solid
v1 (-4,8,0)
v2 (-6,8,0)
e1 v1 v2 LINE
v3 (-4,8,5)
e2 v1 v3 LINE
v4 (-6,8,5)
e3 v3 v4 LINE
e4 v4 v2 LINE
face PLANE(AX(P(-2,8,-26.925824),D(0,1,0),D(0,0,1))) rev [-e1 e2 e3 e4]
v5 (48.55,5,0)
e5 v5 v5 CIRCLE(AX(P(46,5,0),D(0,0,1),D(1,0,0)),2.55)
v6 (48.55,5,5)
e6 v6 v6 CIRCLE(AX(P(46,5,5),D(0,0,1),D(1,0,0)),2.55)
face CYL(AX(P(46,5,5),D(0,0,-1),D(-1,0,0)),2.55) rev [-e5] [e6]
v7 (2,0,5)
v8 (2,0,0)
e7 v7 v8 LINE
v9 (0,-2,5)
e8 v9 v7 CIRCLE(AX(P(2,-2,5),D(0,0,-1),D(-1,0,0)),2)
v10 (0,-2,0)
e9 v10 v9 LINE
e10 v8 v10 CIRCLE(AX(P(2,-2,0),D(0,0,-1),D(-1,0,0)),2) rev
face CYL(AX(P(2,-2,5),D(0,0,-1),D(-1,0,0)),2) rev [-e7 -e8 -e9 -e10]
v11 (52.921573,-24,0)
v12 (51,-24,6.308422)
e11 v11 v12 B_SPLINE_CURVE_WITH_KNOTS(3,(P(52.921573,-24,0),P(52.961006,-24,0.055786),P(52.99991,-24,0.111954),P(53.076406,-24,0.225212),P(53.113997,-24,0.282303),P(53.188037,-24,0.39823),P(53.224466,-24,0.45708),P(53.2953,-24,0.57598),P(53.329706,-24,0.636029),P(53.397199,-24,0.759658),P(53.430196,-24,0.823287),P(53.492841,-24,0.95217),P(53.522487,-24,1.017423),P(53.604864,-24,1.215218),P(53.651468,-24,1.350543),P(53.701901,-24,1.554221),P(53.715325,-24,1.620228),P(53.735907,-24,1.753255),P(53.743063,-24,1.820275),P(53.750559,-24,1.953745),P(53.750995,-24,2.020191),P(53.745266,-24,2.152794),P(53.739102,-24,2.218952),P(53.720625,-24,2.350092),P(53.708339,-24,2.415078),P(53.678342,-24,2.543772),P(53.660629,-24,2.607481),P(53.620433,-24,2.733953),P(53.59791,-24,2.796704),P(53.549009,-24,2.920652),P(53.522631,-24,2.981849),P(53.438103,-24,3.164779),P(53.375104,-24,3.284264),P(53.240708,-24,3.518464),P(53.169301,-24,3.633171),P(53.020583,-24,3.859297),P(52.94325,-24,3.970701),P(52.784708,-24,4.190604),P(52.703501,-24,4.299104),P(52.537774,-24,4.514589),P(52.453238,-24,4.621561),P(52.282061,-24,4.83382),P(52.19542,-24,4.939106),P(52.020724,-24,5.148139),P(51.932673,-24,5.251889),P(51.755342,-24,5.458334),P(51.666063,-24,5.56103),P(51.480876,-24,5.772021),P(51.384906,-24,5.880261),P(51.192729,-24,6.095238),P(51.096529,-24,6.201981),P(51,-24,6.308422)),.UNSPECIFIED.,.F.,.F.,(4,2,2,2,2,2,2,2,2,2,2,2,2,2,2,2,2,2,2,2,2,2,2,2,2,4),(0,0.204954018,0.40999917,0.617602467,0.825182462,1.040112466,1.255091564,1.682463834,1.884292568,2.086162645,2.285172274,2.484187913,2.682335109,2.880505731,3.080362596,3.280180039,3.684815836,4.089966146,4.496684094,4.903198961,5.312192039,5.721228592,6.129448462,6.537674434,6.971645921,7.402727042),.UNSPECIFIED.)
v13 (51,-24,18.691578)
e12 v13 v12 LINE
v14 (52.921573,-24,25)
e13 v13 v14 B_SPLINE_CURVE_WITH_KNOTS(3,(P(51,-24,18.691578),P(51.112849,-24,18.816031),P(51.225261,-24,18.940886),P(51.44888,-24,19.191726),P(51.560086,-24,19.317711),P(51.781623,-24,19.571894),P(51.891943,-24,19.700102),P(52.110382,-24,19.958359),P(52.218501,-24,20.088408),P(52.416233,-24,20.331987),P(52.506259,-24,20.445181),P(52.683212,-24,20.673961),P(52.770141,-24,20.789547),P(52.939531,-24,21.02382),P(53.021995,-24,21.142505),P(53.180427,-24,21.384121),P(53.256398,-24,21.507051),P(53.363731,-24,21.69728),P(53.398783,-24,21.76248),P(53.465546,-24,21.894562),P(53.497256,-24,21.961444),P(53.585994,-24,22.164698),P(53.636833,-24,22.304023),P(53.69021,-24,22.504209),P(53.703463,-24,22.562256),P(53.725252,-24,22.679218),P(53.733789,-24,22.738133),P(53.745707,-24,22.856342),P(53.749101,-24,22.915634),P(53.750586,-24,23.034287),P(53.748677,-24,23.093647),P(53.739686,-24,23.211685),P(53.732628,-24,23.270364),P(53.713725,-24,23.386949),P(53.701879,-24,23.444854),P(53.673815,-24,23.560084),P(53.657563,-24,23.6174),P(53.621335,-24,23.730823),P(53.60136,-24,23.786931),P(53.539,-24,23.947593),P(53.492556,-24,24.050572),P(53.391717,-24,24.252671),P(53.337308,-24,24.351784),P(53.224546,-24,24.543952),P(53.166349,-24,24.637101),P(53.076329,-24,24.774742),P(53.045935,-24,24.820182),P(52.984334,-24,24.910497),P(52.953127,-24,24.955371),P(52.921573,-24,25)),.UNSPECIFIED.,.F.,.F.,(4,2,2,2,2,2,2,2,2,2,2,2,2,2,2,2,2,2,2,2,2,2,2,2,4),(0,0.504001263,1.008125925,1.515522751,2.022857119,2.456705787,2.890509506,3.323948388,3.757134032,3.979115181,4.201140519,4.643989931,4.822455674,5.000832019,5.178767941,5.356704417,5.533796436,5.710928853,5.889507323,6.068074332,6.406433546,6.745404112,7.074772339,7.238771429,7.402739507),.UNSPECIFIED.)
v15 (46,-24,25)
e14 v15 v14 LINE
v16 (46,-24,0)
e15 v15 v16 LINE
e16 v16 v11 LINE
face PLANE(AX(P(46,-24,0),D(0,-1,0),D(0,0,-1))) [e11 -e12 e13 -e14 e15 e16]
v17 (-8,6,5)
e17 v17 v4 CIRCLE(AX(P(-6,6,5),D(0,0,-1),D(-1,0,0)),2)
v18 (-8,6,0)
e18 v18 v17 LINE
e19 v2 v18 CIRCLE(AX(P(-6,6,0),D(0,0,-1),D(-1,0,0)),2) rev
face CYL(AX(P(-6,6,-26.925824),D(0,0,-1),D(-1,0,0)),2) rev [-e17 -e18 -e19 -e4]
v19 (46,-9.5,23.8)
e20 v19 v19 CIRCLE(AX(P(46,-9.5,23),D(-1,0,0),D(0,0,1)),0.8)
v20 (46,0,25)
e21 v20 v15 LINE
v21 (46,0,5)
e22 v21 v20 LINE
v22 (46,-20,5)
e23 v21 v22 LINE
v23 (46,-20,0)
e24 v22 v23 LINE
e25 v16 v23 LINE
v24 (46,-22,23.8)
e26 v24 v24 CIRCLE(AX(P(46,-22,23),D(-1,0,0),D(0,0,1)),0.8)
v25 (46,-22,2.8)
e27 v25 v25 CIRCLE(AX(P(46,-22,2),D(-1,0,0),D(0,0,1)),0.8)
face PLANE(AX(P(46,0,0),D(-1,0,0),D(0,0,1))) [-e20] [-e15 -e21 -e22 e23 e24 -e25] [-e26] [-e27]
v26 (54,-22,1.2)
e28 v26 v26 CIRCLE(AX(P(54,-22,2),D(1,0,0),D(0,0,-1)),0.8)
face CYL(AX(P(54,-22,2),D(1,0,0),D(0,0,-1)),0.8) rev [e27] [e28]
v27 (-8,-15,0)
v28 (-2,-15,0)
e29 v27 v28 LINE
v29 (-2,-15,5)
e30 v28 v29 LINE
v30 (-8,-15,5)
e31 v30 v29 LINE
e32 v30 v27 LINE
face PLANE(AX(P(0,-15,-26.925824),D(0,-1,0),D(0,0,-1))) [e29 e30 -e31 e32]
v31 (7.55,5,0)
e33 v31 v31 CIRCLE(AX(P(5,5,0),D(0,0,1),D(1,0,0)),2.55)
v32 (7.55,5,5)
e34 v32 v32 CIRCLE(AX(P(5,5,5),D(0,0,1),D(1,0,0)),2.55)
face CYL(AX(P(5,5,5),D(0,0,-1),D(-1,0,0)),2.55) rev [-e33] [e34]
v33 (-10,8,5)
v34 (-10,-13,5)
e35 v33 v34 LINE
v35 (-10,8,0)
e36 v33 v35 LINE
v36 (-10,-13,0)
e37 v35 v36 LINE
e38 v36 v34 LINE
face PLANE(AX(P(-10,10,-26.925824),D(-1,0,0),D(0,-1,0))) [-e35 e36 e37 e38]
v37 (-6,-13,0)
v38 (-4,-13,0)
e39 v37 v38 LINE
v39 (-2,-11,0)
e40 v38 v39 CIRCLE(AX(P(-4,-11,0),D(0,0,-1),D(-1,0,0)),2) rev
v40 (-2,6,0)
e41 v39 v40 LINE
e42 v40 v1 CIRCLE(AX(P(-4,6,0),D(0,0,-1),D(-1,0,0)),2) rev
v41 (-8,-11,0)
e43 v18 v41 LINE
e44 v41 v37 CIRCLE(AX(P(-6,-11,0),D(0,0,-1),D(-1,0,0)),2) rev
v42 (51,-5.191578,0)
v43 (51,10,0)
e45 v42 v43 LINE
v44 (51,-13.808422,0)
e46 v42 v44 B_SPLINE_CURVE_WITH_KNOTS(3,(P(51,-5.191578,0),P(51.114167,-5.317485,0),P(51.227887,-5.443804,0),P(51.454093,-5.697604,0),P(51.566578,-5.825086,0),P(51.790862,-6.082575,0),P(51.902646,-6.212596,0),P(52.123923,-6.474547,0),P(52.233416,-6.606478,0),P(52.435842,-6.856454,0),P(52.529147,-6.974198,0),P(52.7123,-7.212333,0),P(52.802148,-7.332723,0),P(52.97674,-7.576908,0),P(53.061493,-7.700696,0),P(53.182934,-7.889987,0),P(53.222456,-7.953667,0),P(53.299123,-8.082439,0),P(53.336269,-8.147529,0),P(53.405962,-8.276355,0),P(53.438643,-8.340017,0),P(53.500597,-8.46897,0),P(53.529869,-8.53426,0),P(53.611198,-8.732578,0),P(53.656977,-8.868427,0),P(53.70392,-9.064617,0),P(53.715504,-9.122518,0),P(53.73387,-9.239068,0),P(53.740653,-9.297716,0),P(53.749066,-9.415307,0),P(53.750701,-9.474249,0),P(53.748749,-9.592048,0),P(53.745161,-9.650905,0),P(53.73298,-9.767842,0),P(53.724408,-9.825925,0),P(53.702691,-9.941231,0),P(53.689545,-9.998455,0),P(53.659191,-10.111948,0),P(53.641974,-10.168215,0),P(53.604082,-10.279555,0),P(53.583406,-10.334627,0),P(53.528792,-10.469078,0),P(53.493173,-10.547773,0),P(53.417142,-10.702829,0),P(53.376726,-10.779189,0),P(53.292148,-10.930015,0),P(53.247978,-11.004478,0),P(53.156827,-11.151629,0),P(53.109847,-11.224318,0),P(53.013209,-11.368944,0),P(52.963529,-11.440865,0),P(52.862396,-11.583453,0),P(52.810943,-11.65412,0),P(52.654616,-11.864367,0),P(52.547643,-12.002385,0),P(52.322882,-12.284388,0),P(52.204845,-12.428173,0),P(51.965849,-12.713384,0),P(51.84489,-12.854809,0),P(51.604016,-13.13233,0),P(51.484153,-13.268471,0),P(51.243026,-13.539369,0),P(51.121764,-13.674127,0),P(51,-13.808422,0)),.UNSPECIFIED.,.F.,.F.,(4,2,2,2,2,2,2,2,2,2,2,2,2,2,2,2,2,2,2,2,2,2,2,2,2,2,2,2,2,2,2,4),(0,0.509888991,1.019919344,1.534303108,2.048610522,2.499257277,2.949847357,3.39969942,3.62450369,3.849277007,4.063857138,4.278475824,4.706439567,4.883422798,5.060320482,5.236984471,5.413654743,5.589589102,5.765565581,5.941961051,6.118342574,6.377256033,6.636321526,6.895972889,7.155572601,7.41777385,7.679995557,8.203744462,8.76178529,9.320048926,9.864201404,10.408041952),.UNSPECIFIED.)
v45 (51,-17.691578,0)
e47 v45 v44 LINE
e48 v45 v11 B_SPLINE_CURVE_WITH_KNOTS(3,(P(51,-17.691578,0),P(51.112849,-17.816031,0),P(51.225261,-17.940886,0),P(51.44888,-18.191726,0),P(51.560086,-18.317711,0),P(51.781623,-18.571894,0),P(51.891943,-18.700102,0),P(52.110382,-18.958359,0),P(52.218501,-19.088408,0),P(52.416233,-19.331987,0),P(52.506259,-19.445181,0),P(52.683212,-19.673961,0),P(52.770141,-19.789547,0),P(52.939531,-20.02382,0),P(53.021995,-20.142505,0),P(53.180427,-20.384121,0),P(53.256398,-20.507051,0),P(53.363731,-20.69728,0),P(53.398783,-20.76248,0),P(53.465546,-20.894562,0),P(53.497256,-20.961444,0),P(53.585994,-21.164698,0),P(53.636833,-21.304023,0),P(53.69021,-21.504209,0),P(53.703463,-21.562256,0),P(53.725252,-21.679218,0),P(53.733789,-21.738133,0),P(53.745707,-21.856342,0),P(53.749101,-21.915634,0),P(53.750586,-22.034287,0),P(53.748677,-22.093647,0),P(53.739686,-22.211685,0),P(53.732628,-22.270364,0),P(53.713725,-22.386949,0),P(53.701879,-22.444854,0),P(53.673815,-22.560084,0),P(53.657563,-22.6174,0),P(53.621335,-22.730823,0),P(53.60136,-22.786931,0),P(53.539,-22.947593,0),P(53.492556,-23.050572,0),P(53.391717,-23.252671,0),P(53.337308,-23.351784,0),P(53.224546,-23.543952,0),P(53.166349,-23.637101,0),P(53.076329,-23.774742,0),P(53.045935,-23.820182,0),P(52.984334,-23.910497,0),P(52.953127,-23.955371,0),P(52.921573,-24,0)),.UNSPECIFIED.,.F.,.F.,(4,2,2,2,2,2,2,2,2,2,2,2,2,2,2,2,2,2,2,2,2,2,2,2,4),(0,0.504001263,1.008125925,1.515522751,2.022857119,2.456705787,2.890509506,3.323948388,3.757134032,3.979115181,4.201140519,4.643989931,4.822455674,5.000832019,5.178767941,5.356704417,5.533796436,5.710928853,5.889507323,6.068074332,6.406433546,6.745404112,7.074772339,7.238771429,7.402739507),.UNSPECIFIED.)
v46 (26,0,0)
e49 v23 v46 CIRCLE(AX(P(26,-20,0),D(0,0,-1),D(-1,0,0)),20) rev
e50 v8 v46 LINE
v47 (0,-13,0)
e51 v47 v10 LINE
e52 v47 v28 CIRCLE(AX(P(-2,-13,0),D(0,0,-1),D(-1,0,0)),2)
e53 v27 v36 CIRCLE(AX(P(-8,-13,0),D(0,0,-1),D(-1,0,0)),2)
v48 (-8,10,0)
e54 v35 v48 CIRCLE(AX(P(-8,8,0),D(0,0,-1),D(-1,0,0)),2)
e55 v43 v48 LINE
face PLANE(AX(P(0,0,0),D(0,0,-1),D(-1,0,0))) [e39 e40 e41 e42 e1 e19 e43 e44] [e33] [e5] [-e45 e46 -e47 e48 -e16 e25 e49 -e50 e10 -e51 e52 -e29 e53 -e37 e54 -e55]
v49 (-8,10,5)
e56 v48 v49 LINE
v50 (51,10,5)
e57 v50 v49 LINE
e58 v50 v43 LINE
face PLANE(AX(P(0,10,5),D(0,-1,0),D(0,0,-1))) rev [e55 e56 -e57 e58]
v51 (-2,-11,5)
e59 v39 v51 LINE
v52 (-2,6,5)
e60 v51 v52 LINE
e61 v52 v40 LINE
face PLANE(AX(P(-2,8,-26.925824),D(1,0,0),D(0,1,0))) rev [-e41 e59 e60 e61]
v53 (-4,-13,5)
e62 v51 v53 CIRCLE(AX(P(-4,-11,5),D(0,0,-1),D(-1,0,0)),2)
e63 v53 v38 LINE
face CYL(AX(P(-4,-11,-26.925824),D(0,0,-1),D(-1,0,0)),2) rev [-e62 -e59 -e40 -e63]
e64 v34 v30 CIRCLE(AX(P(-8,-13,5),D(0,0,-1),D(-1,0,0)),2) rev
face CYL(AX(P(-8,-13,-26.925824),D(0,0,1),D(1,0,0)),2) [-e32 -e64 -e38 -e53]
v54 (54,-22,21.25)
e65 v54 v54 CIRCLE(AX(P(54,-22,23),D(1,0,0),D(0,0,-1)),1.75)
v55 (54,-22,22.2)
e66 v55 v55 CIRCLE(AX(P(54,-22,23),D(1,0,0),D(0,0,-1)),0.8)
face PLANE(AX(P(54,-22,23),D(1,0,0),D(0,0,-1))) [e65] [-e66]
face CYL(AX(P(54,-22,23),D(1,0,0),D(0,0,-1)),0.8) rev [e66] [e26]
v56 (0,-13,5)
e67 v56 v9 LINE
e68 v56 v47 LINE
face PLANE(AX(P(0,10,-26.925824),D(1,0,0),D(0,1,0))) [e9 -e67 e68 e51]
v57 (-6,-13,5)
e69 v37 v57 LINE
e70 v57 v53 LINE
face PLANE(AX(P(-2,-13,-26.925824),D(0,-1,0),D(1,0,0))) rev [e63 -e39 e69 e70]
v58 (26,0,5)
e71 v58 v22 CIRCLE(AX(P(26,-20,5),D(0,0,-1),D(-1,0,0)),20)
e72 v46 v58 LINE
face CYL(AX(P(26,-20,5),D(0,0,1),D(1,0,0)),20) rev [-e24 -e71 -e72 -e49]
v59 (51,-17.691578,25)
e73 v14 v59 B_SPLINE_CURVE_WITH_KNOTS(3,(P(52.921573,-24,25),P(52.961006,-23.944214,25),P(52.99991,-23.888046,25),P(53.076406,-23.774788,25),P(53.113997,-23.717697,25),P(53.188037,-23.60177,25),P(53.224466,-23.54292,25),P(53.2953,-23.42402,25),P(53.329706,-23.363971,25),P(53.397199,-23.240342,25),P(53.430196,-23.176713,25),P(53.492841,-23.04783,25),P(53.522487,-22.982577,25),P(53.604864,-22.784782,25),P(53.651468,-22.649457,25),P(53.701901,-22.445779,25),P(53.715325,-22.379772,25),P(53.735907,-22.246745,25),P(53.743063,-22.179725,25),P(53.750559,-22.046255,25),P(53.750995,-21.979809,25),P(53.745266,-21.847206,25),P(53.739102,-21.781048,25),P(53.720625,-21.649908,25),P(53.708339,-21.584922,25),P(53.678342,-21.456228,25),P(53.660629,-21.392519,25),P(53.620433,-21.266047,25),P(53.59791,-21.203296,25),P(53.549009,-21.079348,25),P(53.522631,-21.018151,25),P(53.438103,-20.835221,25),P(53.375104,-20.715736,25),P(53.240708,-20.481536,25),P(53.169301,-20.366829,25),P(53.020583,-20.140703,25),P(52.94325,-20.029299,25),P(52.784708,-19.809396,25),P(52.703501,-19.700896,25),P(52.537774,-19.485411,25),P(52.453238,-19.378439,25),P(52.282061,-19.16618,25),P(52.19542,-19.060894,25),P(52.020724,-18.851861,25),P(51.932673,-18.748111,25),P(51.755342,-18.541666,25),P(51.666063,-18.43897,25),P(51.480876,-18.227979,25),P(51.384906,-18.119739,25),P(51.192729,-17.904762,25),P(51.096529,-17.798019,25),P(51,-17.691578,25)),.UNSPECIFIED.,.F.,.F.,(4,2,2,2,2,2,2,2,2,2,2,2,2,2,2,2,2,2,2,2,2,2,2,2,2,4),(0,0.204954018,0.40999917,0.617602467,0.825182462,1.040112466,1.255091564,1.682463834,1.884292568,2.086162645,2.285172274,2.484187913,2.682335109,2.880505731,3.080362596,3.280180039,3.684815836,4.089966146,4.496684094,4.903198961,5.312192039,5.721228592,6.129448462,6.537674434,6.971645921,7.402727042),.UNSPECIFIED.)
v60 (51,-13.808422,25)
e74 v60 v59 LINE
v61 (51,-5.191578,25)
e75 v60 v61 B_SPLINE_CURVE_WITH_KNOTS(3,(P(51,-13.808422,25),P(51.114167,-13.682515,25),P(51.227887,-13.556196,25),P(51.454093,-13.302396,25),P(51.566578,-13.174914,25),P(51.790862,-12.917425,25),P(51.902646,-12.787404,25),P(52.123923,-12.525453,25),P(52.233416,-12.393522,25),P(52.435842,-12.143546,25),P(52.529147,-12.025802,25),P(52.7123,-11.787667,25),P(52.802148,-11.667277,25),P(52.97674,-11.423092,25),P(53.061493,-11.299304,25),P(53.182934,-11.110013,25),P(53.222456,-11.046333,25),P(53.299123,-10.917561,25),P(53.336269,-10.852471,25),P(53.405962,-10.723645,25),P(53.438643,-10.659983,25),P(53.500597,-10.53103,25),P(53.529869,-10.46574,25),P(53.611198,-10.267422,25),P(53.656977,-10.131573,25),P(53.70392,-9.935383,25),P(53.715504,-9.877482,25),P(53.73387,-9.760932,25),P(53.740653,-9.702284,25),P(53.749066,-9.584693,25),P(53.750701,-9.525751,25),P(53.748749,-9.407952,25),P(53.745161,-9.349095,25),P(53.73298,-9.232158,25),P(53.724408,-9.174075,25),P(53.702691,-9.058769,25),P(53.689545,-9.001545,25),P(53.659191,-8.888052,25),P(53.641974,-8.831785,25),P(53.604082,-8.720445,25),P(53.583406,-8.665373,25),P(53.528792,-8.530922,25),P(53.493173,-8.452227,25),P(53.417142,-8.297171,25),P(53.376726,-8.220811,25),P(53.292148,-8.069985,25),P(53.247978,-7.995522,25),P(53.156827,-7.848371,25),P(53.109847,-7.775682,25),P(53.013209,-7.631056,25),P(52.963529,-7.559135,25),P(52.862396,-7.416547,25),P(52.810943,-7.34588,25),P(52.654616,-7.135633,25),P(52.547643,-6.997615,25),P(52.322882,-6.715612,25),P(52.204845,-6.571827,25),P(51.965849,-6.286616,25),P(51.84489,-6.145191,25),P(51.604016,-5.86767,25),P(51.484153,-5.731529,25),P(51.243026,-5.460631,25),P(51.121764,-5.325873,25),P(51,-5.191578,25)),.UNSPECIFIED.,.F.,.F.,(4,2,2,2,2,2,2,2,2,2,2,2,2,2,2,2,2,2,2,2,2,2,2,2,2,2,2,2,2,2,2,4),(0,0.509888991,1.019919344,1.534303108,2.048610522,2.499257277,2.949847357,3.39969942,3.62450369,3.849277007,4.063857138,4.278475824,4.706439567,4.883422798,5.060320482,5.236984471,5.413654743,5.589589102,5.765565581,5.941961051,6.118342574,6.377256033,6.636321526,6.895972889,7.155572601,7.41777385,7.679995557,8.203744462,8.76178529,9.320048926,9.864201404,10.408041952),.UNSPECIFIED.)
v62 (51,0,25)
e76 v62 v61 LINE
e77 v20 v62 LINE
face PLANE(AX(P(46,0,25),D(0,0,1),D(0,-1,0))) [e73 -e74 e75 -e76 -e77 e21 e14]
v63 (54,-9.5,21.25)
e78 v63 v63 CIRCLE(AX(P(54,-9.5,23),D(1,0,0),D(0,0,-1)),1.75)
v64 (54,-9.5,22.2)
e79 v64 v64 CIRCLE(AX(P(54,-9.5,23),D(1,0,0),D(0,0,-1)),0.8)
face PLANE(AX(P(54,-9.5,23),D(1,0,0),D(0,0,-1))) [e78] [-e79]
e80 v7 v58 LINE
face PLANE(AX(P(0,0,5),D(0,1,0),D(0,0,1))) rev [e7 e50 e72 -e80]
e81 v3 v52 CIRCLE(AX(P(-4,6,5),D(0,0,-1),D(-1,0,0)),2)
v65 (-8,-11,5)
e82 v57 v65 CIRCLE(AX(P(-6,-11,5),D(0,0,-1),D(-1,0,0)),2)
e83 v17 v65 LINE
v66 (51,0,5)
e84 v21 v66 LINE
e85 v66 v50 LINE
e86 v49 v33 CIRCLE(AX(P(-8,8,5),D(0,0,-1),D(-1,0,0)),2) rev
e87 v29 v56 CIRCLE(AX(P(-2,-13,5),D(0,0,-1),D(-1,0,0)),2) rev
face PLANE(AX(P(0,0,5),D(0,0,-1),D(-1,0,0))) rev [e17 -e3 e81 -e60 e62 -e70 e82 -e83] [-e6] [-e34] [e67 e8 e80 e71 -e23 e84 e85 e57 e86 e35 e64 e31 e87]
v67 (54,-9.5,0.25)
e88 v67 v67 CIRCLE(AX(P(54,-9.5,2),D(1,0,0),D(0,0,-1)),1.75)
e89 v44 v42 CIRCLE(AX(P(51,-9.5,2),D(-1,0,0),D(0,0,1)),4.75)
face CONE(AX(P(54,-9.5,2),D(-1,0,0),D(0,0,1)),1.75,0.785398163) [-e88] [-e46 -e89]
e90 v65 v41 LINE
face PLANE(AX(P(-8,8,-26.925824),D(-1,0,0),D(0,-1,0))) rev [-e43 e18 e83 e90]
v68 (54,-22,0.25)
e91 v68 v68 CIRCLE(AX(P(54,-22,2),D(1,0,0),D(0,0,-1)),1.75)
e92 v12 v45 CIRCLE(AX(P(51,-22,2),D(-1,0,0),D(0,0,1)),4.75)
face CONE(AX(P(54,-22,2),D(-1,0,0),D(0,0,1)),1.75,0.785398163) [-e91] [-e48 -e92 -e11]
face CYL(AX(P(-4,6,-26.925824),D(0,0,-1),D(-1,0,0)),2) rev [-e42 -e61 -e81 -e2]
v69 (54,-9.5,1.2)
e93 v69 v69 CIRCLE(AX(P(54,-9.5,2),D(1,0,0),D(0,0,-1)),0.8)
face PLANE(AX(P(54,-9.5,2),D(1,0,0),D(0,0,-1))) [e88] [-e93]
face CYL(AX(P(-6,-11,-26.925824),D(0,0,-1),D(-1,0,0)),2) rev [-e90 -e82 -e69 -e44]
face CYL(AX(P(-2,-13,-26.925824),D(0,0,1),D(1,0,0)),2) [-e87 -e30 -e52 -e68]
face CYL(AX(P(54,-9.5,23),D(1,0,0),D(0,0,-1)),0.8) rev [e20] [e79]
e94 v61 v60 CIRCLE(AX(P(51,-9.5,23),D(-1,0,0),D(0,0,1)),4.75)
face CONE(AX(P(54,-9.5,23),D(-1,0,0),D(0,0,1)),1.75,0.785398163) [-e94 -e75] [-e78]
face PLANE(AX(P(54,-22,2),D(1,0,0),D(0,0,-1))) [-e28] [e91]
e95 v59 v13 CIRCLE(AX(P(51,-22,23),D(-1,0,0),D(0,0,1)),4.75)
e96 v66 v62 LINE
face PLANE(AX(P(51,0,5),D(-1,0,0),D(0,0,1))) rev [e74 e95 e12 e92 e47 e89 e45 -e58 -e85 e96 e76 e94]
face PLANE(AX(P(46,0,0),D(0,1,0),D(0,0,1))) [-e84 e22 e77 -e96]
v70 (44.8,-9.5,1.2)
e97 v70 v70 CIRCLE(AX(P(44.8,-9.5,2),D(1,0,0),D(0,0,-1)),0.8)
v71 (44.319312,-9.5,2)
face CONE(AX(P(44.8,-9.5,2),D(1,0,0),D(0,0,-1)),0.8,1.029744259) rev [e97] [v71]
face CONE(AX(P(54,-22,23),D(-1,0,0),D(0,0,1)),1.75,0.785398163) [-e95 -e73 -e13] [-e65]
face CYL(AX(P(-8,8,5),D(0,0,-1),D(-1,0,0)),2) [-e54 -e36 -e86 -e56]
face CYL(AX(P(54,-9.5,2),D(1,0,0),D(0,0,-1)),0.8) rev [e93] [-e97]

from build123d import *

# Parameters (mm, degrees)
SKETCH1_W                 = 51
SKETCH1_H                 = 10
SKETCH1_R                 = 2.55
BOSS_EXTRUDE1_DEPTH       = 5
SKETCH3_W                 = 10
SKETCH3_H                 = 25
SKETCH3_W_2               = 6
SKETCH3_H_2               = 21
BOSS_EXTRUDE2_DEPTH       = 5
SKETCH5_W                 = 25
SKETCH5_H                 = 24
BOSS_EXTRUDE3_DEPTH       = 5
FILLET1_R                 = 20
SKETCH6_R                 = 1.75
BOSS_EXTRUDE4_DEPTH       = 3
CHAMFER1_SIZE             = 3
M2X0_4_TAPPED_HOLE1_D     = 1.6
M2X0_4_TAPPED_HOLE1_DEPTH = 9.2
M2X0_4_TAPPED_HOLE1_TIP   = 0.480688495
FILLET2_R                 = 2


with BuildPart() as part:
    # Sketch1 → Boss-Extrude1 (new body)
    with BuildSketch(Plane.XY):
        with Locations((25.5, 5)):
            Rectangle(SKETCH1_W, SKETCH1_H)
        with Locations((5, 5)):
            Circle(SKETCH1_R, mode=Mode.SUBTRACT)
        with Locations((46, 5)):
            Circle(SKETCH1_R, mode=Mode.SUBTRACT)
    extrude(amount=BOSS_EXTRUDE1_DEPTH)

    # Sketch3 → Boss-Extrude2 (add)
    with BuildSketch(Plane.XY.offset(5)):
        with Locations((-5, -2.5)):
            Rectangle(SKETCH3_W, SKETCH3_H)
        with Locations((-5, -2.5)):
            Rectangle(SKETCH3_W_2, SKETCH3_H_2, mode=Mode.SUBTRACT)
    extrude(amount=-BOSS_EXTRUDE2_DEPTH)

    # Sketch5 → Boss-Extrude3 (add)
    with BuildSketch(Plane(origin=(51, 0, 0), x_dir=(0, 0, -1), z_dir=(1, 0, 0))):
        with Locations((-12.5, -12)):
            Rectangle(SKETCH5_W, SKETCH5_H)
    extrude(amount=-BOSS_EXTRUDE3_DEPTH)

    # Fillet1
    fillet1_edges = [part.edges().sort_by_distance(p)[0] for p in [
        (46, 0, 2.5),
    ]]
    fillet(fillet1_edges, radius=FILLET1_R)

    # Sketch6 → Boss-Extrude4 (add)
    with BuildSketch(Plane(origin=(51, 0, 0), x_dir=(0, 0, -1), z_dir=(1, 0, 0))):
        with Locations(Location((-23, -9.5, 0), (0, 0, 180))):
            Circle(SKETCH6_R)
        with Locations(Location((-23, -22, 0), (0, 0, 180))):
            Circle(SKETCH6_R)
        with Locations(Location((-2, -22, 0), (0, 0, 180))):
            Circle(SKETCH6_R)
        with Locations(Location((-2, -9.5, 0), (0, 0, 180))):
            Circle(SKETCH6_R)
    extrude(amount=BOSS_EXTRUDE4_DEPTH)

    # Chamfer1
    # the kernel refuses this chamfer: 3 mm, written as the material it adds along each edge
    with BuildSketch(Plane(origin=(51, -9.5, 23), x_dir=(0, 0, 1), z_dir=(0, 1, 0))) as chamfer1_piece_1_section:
        Polygon((1.75 + CHAMFER1_SIZE, 0), (1.75, CHAMFER1_SIZE), (1.75, 0), align=None)
    chamfer1_piece_1 = revolve(axis=Axis((51, -9.5, 23), (1, 0, 0)), mode=Mode.PRIVATE)
    chamfer1_piece_1 = split(chamfer1_piece_1, bisect_by=Plane(origin=(52.428955804, -9.5, 25), z_dir=(0, 0, -1)), keep=Keep.TOP, mode=Mode.PRIVATE)
    chamfer1_piece_1 = split(chamfer1_piece_1, bisect_by=Plane(origin=(54, -9.5, 19.736191383), z_dir=(-1, 0, 0)), keep=Keep.TOP, mode=Mode.PRIVATE)
    add(chamfer1_piece_1)
    with BuildSketch(Plane(origin=(51, -22, 23), x_dir=(0, 0, 1), z_dir=(0, 1, 0))) as chamfer1_piece_2_section:
        Polygon((1.75 + CHAMFER1_SIZE, 0), (1.75, CHAMFER1_SIZE), (1.75, 0), align=None)
    chamfer1_piece_2 = revolve(axis=Axis((51, -22, 23), (1, 0, 0)), mode=Mode.PRIVATE)
    chamfer1_piece_2 = split(chamfer1_piece_2, bisect_by=Plane(origin=(52.431534605, -24, 19.733612581), z_dir=(0, 1, 0)), keep=Keep.TOP, mode=Mode.PRIVATE)
    chamfer1_piece_2 = split(chamfer1_piece_2, bisect_by=Plane(origin=(52.431534605, -22, 25), z_dir=(0, 0, -1)), keep=Keep.TOP, mode=Mode.PRIVATE)
    chamfer1_piece_2 = split(chamfer1_piece_2, bisect_by=Plane(origin=(54, -22, 19.733612581), z_dir=(-1, 0, 0)), keep=Keep.TOP, mode=Mode.PRIVATE)
    add(chamfer1_piece_2)
    with BuildSketch(Plane(origin=(51, -22, 2), x_dir=(0, 0, 1), z_dir=(0, 1, 0))) as chamfer1_piece_3_section:
        Polygon((1.75 + CHAMFER1_SIZE, 0), (1.75, CHAMFER1_SIZE), (1.75, 0), align=None)
    chamfer1_piece_3 = revolve(axis=Axis((51, -22, 2), (1, 0, 0)), mode=Mode.PRIVATE)
    chamfer1_piece_3 = split(chamfer1_piece_3, bisect_by=Plane(origin=(53.459818879, -23.938254184, 0), z_dir=(0, 0, 1)), keep=Keep.TOP, mode=Mode.PRIVATE)
    chamfer1_piece_3 = split(chamfer1_piece_3, bisect_by=Plane(origin=(53.459818879, -24, 3.119051575), z_dir=(0, 1, 0)), keep=Keep.TOP, mode=Mode.PRIVATE)
    chamfer1_piece_3 = split(chamfer1_piece_3, bisect_by=Plane(origin=(54, -23.938254184, 3.119051575), z_dir=(-1, 0, 0)), keep=Keep.TOP, mode=Mode.PRIVATE)
    add(chamfer1_piece_3)
    with BuildSketch(Plane(origin=(51, -9.5, 2), x_dir=(0, 0, 1), z_dir=(0, 1, 0))) as chamfer1_piece_4_section:
        Polygon((1.75 + CHAMFER1_SIZE, 0), (1.75, CHAMFER1_SIZE), (1.75, 0), align=None)
    chamfer1_piece_4 = revolve(axis=Axis((51, -9.5, 2), (1, 0, 0)), mode=Mode.PRIVATE)
    chamfer1_piece_4 = split(chamfer1_piece_4, bisect_by=Plane(origin=(51.400671534, -13.217061478, 0), z_dir=(0, 0, 1)), keep=Keep.TOP, mode=Mode.PRIVATE)
    chamfer1_piece_4 = split(chamfer1_piece_4, bisect_by=Plane(origin=(54, -13.217061478, 4.146046445), z_dir=(-1, 0, 0)), keep=Keep.TOP, mode=Mode.PRIVATE)
    add(chamfer1_piece_4)

    # M2x0.4 Tapped Hole1
    with Locations(Plane(origin=(54, 0, 0), x_dir=(0, 0, -1), z_dir=(1, 0, 0))):
        with Locations((-23, -22), (-23, -9.5), (-2, -9.5), (-2, -22)):
            Hole(M2X0_4_TAPPED_HOLE1_D / 2, depth=M2X0_4_TAPPED_HOLE1_DEPTH)
            with Locations((0, 0, -(M2X0_4_TAPPED_HOLE1_DEPTH + M2X0_4_TAPPED_HOLE1_TIP / 2))):  # 118° drill point
                Cone(0, M2X0_4_TAPPED_HOLE1_D / 2, M2X0_4_TAPPED_HOLE1_TIP, mode=Mode.SUBTRACT)

    # Fillet2
    fillet2_edges = [part.edges().sort_by_distance(p)[0] for p in [
        (0, -15, 2.5),
        (-10, -15, 2.5),
        (-10, 10, 2.5),
        (-2, -13, 2.5),
        (-8, -13, 2.5),
        (-8, 8, 2.5),
        (-2, 8, 2.5),
        (0, 0, 2.5),
    ]]
    fillet(fillet2_edges, radius=FILLET2_R)


solid = part.part
